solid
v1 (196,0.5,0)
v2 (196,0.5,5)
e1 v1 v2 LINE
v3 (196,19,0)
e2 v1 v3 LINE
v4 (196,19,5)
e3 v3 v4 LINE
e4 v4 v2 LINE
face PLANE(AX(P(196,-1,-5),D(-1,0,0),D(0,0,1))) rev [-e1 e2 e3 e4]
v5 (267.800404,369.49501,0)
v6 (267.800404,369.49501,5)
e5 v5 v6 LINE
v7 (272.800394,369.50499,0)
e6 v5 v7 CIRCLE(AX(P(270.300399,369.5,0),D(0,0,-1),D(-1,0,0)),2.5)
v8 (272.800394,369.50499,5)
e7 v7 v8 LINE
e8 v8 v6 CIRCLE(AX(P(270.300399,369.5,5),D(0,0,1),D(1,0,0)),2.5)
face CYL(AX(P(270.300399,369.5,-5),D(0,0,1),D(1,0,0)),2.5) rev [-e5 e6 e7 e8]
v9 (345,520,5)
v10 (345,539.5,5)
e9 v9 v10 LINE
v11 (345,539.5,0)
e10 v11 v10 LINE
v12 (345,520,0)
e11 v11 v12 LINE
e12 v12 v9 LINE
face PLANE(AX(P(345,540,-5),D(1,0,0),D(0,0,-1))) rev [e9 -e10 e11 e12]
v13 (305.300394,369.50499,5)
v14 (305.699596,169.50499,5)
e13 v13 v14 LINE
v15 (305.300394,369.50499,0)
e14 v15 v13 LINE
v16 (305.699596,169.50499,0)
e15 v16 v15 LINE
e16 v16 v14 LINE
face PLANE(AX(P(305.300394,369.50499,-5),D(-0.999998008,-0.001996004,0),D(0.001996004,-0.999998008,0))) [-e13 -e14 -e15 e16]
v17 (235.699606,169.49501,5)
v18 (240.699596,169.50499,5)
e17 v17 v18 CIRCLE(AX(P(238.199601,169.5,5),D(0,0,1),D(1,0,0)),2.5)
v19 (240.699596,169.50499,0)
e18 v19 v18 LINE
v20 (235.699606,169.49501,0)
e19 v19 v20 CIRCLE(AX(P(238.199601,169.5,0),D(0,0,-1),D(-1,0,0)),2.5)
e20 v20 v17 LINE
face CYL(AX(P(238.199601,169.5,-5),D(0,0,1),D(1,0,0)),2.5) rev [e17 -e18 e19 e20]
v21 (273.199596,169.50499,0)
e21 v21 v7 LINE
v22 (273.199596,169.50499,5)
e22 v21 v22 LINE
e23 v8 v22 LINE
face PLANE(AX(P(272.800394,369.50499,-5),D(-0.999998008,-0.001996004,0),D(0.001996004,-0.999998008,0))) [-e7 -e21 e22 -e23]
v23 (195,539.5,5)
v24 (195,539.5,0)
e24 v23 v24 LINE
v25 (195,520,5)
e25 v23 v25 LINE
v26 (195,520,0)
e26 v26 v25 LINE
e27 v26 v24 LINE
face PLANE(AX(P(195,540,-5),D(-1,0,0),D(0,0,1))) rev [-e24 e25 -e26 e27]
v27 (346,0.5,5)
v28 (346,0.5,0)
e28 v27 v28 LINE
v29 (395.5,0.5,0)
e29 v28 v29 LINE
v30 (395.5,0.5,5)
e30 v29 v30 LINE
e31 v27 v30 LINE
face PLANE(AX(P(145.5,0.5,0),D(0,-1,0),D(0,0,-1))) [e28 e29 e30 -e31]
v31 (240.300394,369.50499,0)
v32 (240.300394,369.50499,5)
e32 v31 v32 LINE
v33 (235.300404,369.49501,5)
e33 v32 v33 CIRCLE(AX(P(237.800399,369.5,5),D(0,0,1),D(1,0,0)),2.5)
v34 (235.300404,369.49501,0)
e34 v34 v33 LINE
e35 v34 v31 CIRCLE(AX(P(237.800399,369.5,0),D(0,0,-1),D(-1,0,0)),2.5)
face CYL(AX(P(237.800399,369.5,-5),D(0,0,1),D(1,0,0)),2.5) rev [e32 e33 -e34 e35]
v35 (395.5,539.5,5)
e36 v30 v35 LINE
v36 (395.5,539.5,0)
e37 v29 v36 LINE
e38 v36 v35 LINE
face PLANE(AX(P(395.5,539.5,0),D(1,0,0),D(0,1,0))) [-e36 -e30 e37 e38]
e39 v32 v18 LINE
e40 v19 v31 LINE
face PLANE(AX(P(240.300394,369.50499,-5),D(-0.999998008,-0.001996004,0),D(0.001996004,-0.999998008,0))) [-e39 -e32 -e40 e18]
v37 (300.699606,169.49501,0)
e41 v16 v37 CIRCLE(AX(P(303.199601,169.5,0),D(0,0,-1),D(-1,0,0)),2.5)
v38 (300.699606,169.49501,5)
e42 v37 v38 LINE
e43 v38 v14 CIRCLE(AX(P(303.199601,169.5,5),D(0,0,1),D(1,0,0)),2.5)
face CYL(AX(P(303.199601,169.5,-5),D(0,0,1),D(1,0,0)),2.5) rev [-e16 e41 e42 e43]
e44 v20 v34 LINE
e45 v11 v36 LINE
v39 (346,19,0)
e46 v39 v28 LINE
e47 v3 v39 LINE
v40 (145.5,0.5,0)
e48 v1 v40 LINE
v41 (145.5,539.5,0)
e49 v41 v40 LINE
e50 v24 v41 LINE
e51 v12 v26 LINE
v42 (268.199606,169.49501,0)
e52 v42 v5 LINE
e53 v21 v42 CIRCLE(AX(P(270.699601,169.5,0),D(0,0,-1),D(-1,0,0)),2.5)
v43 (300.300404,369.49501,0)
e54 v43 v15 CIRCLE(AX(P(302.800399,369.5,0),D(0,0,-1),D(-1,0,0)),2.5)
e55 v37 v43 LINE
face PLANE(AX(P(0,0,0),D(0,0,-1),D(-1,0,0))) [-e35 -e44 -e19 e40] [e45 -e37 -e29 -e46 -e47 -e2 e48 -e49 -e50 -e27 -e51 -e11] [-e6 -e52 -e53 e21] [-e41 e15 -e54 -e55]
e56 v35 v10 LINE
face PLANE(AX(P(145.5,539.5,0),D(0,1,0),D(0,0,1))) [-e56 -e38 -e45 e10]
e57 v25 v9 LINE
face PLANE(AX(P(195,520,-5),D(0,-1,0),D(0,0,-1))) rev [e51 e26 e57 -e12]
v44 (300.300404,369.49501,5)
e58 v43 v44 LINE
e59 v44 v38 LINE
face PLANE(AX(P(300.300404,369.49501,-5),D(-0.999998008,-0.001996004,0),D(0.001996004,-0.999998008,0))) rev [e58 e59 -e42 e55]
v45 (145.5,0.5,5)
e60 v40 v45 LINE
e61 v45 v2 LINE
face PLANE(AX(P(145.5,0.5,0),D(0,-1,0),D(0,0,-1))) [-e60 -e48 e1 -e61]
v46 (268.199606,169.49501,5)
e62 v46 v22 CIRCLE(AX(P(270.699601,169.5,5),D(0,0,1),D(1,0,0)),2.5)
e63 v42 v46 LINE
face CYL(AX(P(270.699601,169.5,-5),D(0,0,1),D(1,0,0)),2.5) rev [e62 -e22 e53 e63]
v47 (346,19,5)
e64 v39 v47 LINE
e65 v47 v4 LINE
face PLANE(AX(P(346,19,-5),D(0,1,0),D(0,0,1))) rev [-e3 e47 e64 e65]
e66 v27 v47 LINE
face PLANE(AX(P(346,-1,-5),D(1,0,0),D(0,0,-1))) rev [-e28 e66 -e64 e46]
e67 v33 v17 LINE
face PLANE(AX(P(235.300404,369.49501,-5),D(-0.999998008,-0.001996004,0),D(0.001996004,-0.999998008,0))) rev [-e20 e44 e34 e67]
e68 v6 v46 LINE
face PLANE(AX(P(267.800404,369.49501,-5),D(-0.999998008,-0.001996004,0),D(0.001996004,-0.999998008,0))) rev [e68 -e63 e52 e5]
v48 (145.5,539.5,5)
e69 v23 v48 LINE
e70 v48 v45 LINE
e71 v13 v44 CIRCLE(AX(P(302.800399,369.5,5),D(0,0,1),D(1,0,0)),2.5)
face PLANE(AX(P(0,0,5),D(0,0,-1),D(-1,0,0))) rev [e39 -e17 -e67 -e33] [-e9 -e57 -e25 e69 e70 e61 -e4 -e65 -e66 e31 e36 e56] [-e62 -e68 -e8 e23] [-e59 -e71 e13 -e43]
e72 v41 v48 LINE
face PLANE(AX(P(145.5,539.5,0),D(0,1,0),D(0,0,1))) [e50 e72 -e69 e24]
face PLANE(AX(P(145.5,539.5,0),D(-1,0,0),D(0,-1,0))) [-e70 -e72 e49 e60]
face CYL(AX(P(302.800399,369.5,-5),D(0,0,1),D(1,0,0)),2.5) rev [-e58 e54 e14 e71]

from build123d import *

# Parameters (mm, degrees)
SKETCH1_W           = 540
SKETCH1_H           = 540
BOSS_EXTRUDE1_DEPTH = 5
CHAMFER2_SIZE       = 0.5
CHAMFER3_SIZE       = 2
SKETCH3_W           = 150
SKETCH3_H           = 20
CUT_EXTRUDE2_DEPTH  = 10
CIRPATTERN1_COUNT   = 4
CUT_EXTRUDE3_DEPTH  = 10
LPATTERN1_COUNT     = 2
LPATTERN1_PITCH     = 32.5
LPATTERN2_COUNT     = 2
LPATTERN2_PITCH     = 32.5
SKETCH7_W           = 697.267045649
SKETCH7_H           = 709.774077858
SKETCH7_W_2         = 250
SKETCH7_H_2         = 539
CUT_EXTRUDE4_DEPTH  = 764.691691719


with BuildPart() as part:
    # Sketch1 → Boss-Extrude1 (new body)
    with BuildSketch(Plane.XY):
        with Locations((270, 270)):
            Rectangle(SKETCH1_W, SKETCH1_H)
    extrude(amount=BOSS_EXTRUDE1_DEPTH)

    # Chamfer2
    chamfer2_edges = [part.edges().sort_by_distance(p)[0] for p in [
        (540, 270, 5),
        (270, 540, 5),
        (0, 270, 5),
        (270, 540, 0),
        (540, 270, 0),
        (270, 0, 0),
        (0, 270, 0),
        (270, 0, 5),
    ]]
    chamfer(chamfer2_edges, length=CHAMFER2_SIZE)

    # Chamfer3
    # the kernel refuses this chamfer: 2 mm, written as the material it takes off along each edge
    with BuildSketch(Plane(origin=(0, 540, -4.643365976), x_dir=(-0.027495876610586483, -0.9996219169112968, 0), z_dir=(0, 0, 1)), Plane(origin=(0, 0, -4.643365976), x_dir=(0.9996219169112968, -0.027495876610586372, 0), z_dir=(0, 0, 1))) as chamfer3_piece_1:
        Polygon((CHAMFER3_SIZE * 0.999621916911, CHAMFER3_SIZE * 0.0274958766106), (-CHAMFER3_SIZE * 0.0274958766106, CHAMFER3_SIZE * 0.999621916911), (0, 0), align=None)
    extrude(amount=14.286731952, mode=Mode.SUBTRACT)
    with BuildSketch(Plane(origin=(540, 540, -4.643365976), x_dir=(0.02749587661058229, -0.9996219169112968, 0), z_dir=(0, 0, 1)), Plane(origin=(540, 0, -4.643365976), x_dir=(-0.9996219169112968, -0.027495876610586483, 0), z_dir=(0, 0, 1))) as chamfer3_piece_2:
        Polygon((CHAMFER3_SIZE * 0.999621916911, -CHAMFER3_SIZE * 0.0274958766106), (-CHAMFER3_SIZE * 0.0274958766106, -CHAMFER3_SIZE * 0.999621916911), (0, 0), align=None)
    extrude(amount=14.286731952, mode=Mode.SUBTRACT)

    # Sketch3 → Cut-Extrude2 (cut)
    with BuildSketch(Plane.XY.offset(5)):
        with Locations((270, 530)):
            Rectangle(SKETCH3_W, SKETCH3_H)
    cut_extrude2 = extrude(amount=-CUT_EXTRUDE2_DEPTH, mode=Mode.SUBTRACT)

    # CirPattern1: Cut-Extrude2 ×4 about axis
    cirpattern1_axis = Axis((270.5, 269.5, 0), (0, 0, 1))
    for i in range(1, CIRPATTERN1_COUNT):
        add(cut_extrude2.rotate(cirpattern1_axis, i * 360 / CIRPATTERN1_COUNT), mode=Mode.SUBTRACT)

    # Sketch6 → Cut-Extrude3 (cut)
    with BuildSketch(Plane.XY.offset(5)):
        with BuildLine():
            Line((272.800394222, 369.50499001), (273.199595818, 169.50499001))
            ThreePointArc((273.199595818, 169.50499001), (270.704590808, 167.00000498), (268.199605778, 169.49500999))
            Line((268.199605778, 169.49500999), (267.800404182, 369.49500999))
            ThreePointArc((267.800404182, 369.49500999), (270.295409192, 371.99999502), (272.800394222, 369.50499001))
        make_face()
    cut_extrude3 = extrude(amount=-CUT_EXTRUDE3_DEPTH, mode=Mode.SUBTRACT)

    # LPattern1: Cut-Extrude3 ×2
    with Locations(*[(i * LPATTERN1_PITCH, 0, 0) for i in range(1, LPATTERN1_COUNT)]):
        add(cut_extrude3, mode=Mode.SUBTRACT)

    # LPattern2: Cut-Extrude3 ×2
    with Locations(*[(-i * LPATTERN2_PITCH, 0, 0) for i in range(1, LPATTERN2_COUNT)]):
        add(cut_extrude3, mode=Mode.SUBTRACT)

    # Sketch7 → Cut-Extrude4 (cut, through all)
    with BuildSketch(Plane.XY.offset(5)):
        with Locations((264.820460551, 266.911861518)):
            Rectangle(SKETCH7_W, SKETCH7_H)
        with Locations((270.5, 270)):
            Rectangle(SKETCH7_W_2, SKETCH7_H_2, mode=Mode.SUBTRACT)
    extrude(amount=-CUT_EXTRUDE4_DEPTH, mode=Mode.SUBTRACT)


solid = part.part
